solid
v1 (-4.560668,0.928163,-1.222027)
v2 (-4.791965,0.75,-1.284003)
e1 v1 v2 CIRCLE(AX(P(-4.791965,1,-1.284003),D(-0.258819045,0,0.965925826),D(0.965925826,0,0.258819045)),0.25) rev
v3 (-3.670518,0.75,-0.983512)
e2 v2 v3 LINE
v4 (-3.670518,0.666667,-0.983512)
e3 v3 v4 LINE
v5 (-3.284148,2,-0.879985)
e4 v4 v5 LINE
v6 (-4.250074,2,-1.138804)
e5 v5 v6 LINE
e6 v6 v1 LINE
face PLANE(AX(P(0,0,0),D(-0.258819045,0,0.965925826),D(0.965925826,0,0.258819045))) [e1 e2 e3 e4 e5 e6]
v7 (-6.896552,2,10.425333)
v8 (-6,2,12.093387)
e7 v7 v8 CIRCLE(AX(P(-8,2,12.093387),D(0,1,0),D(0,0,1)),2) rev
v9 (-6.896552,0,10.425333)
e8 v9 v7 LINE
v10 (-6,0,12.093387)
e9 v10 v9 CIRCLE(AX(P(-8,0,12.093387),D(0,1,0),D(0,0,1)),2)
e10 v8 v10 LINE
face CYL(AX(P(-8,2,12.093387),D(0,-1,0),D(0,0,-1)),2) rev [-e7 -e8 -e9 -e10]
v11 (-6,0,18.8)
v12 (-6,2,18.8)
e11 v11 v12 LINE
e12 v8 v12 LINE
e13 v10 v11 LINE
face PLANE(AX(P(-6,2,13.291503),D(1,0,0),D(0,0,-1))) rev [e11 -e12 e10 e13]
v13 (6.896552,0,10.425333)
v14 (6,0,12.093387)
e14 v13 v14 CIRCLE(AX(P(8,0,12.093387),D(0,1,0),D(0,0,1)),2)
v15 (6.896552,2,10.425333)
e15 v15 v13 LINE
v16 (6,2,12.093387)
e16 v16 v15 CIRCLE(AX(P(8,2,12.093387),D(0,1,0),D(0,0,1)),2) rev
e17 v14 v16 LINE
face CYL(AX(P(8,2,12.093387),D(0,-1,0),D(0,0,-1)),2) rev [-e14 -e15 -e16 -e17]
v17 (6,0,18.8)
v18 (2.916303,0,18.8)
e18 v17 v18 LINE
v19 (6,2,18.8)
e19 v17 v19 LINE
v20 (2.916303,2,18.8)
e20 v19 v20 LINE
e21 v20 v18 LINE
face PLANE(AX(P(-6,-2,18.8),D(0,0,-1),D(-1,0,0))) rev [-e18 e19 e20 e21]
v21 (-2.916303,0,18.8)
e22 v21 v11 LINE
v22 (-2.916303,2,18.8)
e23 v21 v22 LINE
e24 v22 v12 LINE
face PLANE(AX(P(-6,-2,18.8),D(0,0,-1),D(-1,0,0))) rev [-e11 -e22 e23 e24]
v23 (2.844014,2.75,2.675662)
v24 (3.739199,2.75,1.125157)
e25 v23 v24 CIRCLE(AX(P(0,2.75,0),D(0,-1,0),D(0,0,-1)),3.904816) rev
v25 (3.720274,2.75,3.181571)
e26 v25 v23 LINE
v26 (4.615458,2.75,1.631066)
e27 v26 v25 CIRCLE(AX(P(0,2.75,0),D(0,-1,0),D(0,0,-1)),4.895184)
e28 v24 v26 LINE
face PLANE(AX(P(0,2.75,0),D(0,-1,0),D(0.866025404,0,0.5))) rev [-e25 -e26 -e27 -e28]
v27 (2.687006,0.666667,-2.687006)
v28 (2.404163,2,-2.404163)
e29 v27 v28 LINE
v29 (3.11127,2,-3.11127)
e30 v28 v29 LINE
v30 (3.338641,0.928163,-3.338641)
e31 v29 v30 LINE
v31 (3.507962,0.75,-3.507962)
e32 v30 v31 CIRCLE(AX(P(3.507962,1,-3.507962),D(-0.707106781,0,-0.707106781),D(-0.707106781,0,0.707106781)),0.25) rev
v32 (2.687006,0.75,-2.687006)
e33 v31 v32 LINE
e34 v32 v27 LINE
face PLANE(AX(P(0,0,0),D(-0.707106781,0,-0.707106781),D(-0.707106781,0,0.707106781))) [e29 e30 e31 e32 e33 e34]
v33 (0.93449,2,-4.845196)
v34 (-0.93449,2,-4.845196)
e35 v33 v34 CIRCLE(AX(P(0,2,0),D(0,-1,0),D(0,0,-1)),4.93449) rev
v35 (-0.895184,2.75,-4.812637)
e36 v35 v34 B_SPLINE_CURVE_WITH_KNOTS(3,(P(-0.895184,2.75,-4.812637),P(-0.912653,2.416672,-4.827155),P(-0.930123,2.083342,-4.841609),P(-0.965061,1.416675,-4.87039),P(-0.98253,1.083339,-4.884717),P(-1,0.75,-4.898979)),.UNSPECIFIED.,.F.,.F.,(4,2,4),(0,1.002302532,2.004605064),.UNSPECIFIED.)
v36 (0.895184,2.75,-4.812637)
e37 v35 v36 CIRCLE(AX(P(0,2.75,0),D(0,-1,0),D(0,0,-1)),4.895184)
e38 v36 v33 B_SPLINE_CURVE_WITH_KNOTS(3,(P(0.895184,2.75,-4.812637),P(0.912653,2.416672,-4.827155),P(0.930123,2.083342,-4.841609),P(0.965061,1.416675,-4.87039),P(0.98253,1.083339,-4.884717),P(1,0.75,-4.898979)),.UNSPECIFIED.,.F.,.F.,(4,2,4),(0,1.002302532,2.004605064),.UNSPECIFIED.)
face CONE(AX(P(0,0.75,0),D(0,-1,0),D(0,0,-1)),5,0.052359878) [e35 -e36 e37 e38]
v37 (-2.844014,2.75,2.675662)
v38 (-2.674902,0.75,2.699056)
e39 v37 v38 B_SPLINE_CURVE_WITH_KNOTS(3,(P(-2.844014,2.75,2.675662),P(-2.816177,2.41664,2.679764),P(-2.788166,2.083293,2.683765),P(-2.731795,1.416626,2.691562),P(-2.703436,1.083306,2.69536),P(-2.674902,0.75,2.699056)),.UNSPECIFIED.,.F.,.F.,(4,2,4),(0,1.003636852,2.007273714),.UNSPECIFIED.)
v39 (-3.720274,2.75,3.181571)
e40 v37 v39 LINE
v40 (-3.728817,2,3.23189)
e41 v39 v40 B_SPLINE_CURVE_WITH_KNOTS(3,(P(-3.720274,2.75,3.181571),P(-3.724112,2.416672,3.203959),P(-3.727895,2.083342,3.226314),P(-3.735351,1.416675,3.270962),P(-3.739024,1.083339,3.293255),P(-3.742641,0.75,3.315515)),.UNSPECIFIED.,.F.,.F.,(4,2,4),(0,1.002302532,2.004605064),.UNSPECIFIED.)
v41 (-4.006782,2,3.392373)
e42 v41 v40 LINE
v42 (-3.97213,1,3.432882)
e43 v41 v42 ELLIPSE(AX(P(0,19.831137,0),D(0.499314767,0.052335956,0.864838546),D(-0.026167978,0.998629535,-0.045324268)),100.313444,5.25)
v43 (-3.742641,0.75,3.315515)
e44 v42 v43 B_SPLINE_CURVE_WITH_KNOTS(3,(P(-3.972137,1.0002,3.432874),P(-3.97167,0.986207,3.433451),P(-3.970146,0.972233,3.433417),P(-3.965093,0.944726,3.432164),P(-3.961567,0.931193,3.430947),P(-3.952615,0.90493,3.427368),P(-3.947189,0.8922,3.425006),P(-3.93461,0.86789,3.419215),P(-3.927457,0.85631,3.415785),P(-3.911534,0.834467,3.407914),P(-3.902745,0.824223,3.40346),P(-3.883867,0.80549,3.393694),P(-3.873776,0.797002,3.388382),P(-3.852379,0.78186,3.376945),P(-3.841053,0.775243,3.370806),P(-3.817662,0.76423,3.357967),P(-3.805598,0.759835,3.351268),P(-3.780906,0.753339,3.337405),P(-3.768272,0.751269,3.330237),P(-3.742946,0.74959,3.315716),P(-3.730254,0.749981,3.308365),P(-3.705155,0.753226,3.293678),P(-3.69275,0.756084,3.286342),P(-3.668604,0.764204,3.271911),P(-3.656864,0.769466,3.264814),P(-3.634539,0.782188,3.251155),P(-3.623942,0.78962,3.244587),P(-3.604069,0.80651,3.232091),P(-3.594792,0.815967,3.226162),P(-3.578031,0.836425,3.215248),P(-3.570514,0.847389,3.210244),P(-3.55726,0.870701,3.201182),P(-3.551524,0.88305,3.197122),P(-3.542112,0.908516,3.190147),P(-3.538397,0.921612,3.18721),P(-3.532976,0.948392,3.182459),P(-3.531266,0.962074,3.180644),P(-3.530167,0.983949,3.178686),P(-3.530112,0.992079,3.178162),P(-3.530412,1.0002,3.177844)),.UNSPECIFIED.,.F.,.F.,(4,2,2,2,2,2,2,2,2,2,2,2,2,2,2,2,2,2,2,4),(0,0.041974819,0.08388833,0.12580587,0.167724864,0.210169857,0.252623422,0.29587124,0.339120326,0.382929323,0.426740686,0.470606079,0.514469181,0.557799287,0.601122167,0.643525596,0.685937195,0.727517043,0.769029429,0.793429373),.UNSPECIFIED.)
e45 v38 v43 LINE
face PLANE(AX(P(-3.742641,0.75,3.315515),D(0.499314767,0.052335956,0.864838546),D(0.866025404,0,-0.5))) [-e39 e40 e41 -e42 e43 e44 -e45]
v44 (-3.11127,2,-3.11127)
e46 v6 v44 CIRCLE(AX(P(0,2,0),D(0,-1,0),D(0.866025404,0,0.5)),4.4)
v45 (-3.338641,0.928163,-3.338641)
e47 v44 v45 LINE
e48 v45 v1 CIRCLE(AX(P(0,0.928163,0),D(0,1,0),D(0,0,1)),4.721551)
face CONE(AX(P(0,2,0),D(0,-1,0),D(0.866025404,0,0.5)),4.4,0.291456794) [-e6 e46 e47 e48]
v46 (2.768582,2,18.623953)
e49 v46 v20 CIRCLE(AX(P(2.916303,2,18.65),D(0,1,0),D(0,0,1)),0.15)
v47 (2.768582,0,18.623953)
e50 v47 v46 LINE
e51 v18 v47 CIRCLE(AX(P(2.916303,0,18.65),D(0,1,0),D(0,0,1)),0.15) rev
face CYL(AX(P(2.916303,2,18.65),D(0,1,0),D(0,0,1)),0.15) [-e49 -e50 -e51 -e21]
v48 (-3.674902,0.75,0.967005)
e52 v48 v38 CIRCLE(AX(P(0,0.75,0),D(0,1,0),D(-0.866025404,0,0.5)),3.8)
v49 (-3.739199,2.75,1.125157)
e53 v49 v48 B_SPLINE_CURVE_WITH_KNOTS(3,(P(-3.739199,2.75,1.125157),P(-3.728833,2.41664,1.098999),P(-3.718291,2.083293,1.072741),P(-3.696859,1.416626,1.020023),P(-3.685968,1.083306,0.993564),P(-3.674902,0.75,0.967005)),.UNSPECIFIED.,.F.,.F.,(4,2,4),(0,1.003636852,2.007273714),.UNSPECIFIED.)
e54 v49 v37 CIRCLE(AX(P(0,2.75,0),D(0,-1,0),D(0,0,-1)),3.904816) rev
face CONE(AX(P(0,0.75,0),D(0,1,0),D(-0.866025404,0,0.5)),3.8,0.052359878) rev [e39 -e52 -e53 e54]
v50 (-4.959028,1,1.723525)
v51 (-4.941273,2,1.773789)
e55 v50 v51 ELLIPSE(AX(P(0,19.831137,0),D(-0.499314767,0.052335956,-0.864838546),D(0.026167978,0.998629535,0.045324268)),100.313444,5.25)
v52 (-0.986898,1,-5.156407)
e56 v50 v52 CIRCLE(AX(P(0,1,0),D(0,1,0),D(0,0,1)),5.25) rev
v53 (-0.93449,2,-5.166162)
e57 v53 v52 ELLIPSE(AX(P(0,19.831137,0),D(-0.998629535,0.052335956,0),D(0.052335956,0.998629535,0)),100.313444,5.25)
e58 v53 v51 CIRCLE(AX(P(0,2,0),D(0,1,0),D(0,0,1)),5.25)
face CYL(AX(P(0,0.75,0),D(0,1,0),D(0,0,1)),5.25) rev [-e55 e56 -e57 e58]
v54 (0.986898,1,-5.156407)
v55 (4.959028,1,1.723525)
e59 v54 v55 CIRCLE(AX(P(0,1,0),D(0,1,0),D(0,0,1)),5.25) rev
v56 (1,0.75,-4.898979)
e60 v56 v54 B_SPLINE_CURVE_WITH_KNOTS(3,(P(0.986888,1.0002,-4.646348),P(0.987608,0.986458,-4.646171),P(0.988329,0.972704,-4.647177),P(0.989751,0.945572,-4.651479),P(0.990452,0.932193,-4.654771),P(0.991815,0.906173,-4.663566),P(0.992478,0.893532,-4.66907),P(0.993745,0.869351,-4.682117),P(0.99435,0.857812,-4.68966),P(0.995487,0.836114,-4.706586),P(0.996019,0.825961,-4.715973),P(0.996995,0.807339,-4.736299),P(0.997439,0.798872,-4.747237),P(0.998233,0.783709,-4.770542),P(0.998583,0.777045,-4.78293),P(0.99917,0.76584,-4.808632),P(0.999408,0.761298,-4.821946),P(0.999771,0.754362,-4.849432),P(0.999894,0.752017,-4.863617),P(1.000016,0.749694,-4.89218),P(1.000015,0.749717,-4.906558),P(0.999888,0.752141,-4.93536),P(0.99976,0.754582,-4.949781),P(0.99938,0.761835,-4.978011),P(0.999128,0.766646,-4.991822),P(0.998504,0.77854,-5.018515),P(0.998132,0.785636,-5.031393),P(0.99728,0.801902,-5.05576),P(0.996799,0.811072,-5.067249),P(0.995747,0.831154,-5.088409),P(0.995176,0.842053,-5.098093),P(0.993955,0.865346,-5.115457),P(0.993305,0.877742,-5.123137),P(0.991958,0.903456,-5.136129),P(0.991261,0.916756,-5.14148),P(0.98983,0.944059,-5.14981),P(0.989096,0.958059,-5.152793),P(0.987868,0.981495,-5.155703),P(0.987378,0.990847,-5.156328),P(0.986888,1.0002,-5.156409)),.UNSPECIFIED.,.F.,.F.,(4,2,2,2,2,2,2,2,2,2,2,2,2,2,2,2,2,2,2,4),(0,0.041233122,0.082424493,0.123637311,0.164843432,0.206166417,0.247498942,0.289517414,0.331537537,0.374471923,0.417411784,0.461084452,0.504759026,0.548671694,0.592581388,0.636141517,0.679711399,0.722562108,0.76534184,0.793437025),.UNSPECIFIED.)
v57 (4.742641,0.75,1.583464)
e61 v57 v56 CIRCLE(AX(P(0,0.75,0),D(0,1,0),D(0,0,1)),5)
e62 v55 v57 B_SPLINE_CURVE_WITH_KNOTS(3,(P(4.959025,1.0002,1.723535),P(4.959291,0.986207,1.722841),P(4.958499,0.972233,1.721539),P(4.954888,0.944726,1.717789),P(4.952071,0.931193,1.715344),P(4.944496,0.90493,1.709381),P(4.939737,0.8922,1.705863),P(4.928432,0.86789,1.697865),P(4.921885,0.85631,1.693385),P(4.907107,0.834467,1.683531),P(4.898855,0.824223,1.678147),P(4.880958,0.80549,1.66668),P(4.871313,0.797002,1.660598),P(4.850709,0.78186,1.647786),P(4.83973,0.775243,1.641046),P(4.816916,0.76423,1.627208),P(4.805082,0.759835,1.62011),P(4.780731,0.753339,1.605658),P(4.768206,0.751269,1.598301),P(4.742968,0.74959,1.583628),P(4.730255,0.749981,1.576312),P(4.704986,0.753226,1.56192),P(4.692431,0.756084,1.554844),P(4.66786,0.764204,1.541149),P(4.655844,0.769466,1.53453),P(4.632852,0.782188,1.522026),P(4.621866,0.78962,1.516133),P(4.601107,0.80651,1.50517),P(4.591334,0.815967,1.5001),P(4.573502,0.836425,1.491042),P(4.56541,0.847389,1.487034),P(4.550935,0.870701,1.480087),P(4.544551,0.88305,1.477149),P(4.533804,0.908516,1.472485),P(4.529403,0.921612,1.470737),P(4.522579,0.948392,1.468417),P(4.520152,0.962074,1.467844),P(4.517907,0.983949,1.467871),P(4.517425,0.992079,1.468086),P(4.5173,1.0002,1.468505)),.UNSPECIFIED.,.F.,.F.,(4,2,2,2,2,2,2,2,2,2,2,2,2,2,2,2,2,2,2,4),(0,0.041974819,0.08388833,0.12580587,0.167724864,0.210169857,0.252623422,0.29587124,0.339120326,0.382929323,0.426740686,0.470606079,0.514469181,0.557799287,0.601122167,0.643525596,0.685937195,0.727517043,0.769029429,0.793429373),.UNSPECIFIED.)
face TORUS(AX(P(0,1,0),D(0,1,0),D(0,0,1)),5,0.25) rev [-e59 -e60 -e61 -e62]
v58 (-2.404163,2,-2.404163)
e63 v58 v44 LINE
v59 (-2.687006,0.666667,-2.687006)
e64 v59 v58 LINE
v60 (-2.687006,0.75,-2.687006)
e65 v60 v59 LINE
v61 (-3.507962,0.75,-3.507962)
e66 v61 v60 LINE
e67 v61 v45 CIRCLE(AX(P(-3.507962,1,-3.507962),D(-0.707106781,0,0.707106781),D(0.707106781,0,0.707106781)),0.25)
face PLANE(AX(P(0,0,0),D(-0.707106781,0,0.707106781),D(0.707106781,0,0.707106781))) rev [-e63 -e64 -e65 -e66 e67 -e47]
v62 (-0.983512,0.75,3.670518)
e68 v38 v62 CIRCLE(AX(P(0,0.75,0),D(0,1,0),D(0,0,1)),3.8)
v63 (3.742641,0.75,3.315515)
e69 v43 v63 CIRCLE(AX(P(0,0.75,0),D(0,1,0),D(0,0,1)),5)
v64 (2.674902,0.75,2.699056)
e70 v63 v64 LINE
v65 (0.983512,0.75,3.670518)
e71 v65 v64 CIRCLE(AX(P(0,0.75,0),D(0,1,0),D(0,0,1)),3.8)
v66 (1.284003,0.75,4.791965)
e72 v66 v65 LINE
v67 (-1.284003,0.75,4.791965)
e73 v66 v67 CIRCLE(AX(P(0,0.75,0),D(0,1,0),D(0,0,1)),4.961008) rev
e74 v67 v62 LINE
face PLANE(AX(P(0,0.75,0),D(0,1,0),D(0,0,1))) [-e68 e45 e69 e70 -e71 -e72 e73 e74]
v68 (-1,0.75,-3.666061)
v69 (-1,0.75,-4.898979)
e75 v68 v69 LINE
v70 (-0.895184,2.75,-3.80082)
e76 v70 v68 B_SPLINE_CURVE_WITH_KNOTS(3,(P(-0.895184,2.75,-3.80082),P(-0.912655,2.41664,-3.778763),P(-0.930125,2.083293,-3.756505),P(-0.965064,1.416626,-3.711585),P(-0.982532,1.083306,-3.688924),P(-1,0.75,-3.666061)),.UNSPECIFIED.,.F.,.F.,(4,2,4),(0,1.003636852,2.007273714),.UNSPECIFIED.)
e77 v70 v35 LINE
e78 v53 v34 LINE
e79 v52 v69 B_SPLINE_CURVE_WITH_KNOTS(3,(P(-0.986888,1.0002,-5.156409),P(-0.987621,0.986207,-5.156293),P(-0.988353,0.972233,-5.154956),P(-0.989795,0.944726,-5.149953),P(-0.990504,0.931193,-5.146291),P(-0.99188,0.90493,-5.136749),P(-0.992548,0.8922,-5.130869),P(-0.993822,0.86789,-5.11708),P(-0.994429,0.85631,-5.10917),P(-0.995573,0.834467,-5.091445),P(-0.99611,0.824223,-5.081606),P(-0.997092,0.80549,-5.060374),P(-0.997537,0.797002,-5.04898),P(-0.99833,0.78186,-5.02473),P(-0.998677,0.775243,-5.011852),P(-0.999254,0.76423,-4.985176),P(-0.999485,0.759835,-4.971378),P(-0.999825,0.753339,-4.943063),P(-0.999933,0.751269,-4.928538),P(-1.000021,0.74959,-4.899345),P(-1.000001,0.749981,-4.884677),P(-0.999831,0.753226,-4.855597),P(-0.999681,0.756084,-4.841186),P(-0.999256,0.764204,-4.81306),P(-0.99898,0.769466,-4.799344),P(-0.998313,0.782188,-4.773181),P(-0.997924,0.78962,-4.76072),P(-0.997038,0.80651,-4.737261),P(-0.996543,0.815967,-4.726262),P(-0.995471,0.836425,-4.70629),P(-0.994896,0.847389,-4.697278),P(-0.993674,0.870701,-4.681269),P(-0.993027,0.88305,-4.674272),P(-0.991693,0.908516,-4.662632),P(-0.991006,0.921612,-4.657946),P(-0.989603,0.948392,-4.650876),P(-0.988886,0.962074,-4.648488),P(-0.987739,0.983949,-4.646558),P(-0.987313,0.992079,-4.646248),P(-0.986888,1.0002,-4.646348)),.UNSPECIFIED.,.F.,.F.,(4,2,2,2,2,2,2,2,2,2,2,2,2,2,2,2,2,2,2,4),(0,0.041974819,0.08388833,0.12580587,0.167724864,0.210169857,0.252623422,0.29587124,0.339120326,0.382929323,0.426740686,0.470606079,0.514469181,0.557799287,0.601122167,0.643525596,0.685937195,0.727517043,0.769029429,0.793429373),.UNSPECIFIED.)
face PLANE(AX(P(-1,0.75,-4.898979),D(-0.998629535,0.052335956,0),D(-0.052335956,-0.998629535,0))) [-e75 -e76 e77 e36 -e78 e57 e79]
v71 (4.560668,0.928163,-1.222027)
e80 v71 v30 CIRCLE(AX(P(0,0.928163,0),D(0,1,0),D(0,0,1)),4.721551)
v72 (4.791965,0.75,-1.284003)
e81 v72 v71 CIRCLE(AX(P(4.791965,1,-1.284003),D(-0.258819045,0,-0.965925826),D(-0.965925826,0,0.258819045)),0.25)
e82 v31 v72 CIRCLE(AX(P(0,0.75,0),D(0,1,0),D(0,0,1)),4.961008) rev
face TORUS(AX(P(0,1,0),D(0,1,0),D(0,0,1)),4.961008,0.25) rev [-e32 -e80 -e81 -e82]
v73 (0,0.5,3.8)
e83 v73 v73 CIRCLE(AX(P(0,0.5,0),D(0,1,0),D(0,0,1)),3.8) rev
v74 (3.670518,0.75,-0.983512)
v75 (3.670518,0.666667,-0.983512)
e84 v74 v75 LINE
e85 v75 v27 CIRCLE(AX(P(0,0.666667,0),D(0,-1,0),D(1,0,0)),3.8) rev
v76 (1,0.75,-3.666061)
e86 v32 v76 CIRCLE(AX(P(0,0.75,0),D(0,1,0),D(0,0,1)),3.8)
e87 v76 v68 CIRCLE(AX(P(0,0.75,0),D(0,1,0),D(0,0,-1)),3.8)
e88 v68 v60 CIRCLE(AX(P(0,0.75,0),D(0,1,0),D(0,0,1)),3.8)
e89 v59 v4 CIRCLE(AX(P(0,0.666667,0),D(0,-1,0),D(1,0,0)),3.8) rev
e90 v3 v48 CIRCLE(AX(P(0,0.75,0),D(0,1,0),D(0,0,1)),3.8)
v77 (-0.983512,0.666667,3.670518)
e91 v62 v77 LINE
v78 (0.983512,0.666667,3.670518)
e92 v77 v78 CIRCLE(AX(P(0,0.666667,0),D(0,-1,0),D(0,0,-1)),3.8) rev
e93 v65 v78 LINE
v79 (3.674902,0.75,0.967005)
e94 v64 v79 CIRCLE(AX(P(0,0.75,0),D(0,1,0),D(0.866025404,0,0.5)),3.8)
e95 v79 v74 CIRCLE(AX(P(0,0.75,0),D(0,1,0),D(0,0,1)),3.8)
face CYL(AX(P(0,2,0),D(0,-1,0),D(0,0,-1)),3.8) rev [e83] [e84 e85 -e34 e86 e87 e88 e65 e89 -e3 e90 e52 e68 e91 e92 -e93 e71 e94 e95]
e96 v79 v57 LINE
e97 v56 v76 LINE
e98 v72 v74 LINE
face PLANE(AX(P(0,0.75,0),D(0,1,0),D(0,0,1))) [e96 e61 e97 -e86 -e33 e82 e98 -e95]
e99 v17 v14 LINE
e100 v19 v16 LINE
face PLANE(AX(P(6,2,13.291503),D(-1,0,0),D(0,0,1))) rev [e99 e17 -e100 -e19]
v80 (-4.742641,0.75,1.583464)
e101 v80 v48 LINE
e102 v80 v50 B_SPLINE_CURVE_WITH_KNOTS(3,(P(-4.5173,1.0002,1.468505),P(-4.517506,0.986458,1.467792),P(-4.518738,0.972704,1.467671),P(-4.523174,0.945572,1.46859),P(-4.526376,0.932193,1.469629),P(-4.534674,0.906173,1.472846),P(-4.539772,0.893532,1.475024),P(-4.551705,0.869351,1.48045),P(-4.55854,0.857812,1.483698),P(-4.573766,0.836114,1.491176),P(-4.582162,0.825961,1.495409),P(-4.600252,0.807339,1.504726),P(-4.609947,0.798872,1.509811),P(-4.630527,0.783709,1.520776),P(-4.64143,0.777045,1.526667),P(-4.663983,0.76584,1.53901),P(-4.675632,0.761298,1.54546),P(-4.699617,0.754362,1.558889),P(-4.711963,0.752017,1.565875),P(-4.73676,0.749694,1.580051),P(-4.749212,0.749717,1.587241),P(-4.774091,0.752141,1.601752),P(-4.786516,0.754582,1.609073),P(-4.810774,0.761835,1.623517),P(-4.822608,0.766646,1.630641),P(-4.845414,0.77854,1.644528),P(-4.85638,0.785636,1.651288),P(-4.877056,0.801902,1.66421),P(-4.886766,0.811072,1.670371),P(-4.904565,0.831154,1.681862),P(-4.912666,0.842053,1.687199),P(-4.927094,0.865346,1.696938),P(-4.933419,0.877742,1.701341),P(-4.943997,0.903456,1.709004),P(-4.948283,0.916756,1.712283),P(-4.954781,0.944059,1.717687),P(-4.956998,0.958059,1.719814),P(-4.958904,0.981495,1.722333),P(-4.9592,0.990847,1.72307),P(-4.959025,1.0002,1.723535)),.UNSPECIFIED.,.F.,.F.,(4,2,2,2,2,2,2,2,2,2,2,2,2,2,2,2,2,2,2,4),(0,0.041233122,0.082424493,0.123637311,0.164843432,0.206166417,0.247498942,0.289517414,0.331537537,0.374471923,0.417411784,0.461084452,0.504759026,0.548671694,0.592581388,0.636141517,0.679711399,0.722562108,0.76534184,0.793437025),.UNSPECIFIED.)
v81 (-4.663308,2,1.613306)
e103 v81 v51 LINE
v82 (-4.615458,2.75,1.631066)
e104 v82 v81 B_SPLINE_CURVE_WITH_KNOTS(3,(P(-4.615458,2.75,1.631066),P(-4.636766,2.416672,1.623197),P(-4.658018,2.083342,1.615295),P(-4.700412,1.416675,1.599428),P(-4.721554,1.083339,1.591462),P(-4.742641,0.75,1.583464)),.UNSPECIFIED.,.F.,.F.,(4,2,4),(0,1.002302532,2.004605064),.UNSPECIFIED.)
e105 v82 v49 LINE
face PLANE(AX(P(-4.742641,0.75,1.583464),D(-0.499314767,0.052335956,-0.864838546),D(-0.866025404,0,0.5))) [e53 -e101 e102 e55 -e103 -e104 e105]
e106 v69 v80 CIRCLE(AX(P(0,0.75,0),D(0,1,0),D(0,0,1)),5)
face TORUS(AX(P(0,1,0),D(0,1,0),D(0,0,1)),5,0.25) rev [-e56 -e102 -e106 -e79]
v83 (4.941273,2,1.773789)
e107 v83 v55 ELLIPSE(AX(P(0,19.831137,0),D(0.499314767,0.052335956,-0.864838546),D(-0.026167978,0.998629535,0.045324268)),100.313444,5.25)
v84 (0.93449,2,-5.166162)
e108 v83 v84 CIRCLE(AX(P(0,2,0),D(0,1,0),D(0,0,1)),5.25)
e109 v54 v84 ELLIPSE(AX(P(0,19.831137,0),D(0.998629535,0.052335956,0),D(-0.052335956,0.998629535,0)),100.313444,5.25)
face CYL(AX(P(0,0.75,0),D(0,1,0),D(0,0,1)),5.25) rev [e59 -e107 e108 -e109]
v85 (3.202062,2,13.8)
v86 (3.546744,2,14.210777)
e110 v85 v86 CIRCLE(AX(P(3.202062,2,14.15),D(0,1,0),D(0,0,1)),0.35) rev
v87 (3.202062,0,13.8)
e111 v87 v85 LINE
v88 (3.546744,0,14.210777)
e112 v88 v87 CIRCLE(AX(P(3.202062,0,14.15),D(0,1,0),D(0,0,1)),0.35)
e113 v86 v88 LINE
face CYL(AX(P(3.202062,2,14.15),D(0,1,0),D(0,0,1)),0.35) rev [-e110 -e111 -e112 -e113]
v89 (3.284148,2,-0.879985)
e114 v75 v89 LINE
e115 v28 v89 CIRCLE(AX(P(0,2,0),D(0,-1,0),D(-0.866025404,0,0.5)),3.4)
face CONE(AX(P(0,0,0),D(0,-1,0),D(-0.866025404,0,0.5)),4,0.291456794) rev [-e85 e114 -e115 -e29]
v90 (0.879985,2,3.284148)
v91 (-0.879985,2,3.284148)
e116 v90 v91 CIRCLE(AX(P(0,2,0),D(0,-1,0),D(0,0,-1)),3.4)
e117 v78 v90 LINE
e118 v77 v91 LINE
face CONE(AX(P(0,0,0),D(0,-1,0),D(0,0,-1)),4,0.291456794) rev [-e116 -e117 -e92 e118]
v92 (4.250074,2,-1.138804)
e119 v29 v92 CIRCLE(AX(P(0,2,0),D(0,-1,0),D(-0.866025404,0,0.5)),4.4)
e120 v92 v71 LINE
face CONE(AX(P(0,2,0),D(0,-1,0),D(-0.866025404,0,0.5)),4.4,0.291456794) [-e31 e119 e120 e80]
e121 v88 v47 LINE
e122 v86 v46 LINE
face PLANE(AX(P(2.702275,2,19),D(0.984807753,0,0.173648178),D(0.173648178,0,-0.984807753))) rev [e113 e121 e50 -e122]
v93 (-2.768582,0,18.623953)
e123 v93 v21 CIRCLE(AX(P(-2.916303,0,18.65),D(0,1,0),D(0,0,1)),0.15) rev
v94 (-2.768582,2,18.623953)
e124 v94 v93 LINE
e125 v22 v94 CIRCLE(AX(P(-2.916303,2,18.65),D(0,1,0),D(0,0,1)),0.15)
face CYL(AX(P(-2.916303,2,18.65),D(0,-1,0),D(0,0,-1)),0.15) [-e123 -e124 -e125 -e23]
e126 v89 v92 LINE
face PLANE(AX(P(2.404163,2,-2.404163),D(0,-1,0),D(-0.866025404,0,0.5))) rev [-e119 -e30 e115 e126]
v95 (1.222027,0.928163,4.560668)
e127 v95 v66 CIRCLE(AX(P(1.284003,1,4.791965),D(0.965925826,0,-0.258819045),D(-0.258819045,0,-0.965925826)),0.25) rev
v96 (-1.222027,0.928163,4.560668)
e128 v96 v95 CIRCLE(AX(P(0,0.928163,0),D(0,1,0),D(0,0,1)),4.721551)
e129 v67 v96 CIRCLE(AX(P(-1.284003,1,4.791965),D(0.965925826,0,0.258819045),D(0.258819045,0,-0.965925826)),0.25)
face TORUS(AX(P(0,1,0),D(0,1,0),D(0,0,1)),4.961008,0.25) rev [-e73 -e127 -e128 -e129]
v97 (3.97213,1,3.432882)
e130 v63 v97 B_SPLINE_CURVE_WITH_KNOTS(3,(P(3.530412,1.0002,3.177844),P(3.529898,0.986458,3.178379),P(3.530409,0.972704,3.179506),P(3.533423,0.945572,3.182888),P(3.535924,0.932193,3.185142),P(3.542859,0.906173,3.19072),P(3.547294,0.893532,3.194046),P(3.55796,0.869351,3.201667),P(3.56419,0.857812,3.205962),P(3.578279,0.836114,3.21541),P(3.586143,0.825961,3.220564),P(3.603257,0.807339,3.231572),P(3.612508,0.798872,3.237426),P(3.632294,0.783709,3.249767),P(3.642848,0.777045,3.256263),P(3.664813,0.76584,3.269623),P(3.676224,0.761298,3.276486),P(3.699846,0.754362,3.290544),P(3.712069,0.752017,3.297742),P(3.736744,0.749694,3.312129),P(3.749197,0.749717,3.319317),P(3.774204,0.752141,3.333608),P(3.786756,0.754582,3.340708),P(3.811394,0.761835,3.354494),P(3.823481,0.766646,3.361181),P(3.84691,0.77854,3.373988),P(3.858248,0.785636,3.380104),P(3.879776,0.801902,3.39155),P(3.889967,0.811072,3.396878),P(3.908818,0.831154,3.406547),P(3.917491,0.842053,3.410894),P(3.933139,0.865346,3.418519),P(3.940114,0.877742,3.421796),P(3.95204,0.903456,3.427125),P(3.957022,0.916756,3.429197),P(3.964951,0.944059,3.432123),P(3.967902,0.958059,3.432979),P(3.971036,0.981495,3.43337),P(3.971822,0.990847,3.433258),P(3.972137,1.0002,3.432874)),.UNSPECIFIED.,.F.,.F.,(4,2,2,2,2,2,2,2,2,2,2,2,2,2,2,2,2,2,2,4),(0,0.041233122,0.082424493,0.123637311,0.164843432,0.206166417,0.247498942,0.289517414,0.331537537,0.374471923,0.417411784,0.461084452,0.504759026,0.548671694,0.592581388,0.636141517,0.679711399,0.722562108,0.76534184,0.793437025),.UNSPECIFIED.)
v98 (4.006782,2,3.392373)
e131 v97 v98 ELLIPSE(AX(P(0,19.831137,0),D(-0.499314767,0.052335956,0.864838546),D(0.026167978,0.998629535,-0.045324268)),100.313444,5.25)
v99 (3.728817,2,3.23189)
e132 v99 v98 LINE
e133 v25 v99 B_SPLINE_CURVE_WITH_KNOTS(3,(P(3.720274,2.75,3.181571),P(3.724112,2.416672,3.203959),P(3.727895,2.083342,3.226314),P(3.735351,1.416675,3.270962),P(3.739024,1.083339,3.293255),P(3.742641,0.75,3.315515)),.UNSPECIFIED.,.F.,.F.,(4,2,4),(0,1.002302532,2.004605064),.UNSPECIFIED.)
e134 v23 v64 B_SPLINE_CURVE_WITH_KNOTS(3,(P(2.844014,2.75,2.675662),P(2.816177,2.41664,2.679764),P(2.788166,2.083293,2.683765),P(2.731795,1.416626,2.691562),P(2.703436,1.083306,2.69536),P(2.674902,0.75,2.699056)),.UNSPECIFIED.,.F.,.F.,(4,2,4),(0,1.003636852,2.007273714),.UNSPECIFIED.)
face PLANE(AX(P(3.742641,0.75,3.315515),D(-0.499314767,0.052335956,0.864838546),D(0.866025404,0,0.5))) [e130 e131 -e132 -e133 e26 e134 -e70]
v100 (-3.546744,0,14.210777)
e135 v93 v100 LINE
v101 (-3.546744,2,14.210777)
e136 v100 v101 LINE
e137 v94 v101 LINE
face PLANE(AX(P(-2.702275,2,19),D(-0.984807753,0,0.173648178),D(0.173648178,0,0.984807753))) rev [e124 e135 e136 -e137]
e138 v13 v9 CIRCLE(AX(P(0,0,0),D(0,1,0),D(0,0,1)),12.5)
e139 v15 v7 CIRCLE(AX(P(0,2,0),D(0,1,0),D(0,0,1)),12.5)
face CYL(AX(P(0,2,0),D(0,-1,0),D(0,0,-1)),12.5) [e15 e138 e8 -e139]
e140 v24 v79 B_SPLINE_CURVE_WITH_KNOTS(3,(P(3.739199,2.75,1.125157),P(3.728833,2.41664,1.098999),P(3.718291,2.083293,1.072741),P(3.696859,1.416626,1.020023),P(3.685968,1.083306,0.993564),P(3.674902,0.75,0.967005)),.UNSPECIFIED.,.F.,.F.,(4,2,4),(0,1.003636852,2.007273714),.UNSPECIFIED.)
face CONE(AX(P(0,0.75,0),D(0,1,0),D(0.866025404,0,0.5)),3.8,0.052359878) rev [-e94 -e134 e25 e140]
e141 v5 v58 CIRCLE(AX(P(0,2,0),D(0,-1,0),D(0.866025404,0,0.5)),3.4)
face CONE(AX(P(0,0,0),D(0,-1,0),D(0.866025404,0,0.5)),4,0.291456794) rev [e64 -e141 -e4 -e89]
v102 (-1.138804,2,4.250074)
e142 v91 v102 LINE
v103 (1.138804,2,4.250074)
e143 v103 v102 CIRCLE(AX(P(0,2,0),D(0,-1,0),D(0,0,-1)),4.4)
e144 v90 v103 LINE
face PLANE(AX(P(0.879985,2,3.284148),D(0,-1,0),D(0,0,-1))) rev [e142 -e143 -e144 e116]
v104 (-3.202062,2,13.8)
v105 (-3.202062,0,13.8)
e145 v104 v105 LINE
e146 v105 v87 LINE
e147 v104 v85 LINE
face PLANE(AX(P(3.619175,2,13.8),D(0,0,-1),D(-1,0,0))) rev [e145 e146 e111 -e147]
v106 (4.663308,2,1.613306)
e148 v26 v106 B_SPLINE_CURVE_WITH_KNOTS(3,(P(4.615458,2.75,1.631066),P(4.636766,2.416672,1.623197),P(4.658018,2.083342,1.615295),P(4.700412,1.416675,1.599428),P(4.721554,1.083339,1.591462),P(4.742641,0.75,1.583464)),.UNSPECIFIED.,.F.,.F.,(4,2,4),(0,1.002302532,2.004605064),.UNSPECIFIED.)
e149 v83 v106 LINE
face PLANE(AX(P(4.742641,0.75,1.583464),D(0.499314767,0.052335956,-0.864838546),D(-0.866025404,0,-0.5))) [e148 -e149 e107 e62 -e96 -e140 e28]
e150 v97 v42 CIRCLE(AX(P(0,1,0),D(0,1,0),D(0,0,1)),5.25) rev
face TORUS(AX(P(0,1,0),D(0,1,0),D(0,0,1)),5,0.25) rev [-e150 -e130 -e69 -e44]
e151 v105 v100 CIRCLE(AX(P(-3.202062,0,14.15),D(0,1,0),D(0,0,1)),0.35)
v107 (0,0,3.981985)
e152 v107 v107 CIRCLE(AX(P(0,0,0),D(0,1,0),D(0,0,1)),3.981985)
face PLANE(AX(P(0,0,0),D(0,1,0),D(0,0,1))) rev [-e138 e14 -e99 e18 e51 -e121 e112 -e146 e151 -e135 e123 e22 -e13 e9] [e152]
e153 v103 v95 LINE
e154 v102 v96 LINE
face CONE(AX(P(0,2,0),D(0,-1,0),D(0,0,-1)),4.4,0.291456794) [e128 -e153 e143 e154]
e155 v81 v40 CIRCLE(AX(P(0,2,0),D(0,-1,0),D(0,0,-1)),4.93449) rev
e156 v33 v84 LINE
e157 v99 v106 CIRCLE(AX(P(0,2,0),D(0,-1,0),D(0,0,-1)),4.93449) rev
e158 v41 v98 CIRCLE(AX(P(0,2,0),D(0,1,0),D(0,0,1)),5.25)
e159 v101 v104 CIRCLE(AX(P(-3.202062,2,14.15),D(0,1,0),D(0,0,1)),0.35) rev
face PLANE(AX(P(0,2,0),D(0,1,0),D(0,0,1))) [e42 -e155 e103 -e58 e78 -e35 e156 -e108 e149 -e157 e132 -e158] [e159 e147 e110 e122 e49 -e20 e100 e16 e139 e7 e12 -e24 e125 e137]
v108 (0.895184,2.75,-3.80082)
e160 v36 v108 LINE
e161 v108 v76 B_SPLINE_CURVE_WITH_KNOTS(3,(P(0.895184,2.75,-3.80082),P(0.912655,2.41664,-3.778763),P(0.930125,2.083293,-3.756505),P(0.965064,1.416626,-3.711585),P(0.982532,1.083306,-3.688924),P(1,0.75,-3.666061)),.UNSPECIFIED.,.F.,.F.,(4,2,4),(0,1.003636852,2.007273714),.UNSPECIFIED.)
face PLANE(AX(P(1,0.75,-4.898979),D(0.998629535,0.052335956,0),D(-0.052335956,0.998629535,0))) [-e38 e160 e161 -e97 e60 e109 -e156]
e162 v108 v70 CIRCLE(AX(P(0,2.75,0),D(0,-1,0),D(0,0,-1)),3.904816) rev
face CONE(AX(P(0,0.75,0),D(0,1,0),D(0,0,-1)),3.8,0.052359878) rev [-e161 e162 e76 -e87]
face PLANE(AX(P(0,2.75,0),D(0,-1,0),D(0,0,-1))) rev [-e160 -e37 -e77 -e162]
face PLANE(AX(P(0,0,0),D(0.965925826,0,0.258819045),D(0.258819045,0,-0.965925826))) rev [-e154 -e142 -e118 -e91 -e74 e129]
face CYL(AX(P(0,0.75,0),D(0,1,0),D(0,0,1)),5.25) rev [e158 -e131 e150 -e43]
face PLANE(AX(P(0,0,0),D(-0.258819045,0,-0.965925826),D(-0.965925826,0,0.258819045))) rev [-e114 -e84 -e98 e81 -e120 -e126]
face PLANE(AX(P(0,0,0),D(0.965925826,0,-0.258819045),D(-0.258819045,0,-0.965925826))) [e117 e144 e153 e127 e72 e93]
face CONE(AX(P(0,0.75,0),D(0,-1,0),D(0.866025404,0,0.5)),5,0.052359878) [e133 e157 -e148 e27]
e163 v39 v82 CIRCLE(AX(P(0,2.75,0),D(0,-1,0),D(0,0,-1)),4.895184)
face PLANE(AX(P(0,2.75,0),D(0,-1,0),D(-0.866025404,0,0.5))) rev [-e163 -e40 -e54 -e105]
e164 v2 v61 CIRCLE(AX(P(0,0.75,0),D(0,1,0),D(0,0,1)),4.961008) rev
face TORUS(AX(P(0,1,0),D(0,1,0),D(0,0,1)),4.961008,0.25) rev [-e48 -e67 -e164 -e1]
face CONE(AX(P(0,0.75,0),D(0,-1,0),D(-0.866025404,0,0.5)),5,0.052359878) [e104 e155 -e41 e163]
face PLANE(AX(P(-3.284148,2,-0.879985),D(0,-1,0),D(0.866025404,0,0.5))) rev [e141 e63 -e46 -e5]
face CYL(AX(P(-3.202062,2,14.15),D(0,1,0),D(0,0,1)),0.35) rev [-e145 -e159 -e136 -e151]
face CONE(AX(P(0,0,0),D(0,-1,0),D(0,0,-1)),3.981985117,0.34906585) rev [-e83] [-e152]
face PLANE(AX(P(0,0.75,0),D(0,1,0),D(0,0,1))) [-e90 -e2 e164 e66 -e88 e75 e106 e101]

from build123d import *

# Parameters (mm, degrees)
SKETCH1_R                = 4
BOSS_EXTRUDE1_DEPTH      = 2
SKETCH2_R                = 12.5
SKETCH2_R_2              = 3.8
BOSS_EXTRUDE2_DEPTH      = 2
SKETCH4_W                = 12
SKETCH4_H                = 0.2
CUT_EXTRUDE1_DEPTH       = 4
FILLET3_R                = 0.35
FILLET4_R                = 0.15
FILLET6_R                = 2
SKETCH13_R               = 5.25
CUT_EXTRUDE5_DEPTH       = 1.25
REVOLVE2_ANGLE           = 30
CIRPATTERN2_COUNT        = 3
CHAMFER1_SIZE            = 0.5
CHAMFER1_SIZE2           = 0.181985117
FILLET14_R               = 0.25
BOSS_EXTRUDE8_DEPTH      = 2
BOSS_EXTRUDE8_DRAFT      = -3
SKETCH16_W               = 2
SKETCH16_H               = 1.934959958
BOSS_EXTRUDE9_DEPTH      = 1.25
BOSS_EXTRUDE9_TAPER      = 3
CIRPATTERN3_COUNT        = 3
CIRPATTERN3_COPY_1_DEPTH = 2
CIRPATTERN3_COPY_1_DRAFT = -3
CIRPATTERN3_COPY_2_DEPTH = 2
CIRPATTERN3_COPY_2_DRAFT = -3


with BuildPart() as part:
    # Sketch1 → Boss-Extrude1 (new body)
    with BuildSketch(Plane(origin=(0, 0, 0), x_dir=(1, 0, 0), z_dir=(0, 1, 0))):
        Polygon((-6, 6), (-6, -13.291502622), (-6, -19), (-2.70227506, -19), (-3.619175359, -13.8), (0, -13.8), (3.619175359, -13.8), (2.70227506, -19), (6, -19), (6, -13.291502622), (6, 6), align=None)
        with Locations(Location((0, 0, 0), (0, 0, 270))):
            Circle(SKETCH1_R, mode=Mode.SUBTRACT)
    extrude(amount=BOSS_EXTRUDE1_DEPTH)

    # Sketch2 → Boss-Extrude2 (add)
    with BuildSketch(Plane(origin=(0, 0, 0), x_dir=(1, 0, 0), z_dir=(0, 1, 0))):
        Circle(SKETCH2_R)
        with Locations(Location((0, 0, 0), (0, 0, 270))):
            Circle(SKETCH2_R_2, mode=Mode.SUBTRACT)
    extrude(amount=BOSS_EXTRUDE2_DEPTH)

    # Sketch4 → Cut-Extrude1 (cut)
    with BuildSketch(Plane(origin=(0, 2, 0), x_dir=(1, 0, 0), z_dir=(0, 1, 0))):
        with Locations((0, -18.9)):
            Rectangle(SKETCH4_W, SKETCH4_H)
    extrude(amount=-CUT_EXTRUDE1_DEPTH, mode=Mode.SUBTRACT)

    # Fillet3
    fillet3_edges = [part.edges().sort_by_distance(p)[0] for p in [
        (3.619175359, 1, 13.8),
        (-3.619175359, 1, 13.8),
    ]]
    fillet(fillet3_edges, radius=FILLET3_R)

    # Fillet4
    fillet4_edges = [part.edges().sort_by_distance(p)[0] for p in [
        (2.737540456, 1, 18.8),
        (-2.737540456, 1, 18.8),
    ]]
    fillet(fillet4_edges, radius=FILLET4_R)

    # Fillet6
    fillet6_edges = [part.edges().sort_by_distance(p)[0] for p in [
        (6, 1, 10.9658561),
        (-6, 1, 10.9658561),
    ]]
    fillet(fillet6_edges, radius=FILLET6_R)

    # Sketch13 → Cut-Extrude5 (cut)
    with BuildSketch(Plane(origin=(0, 2, 0), x_dir=(1, 0, 0), z_dir=(0, 1, 0))):
        with Locations(Location((0, 0, 0), (0, 0, 270))):
            Circle(SKETCH13_R)
    extrude(amount=-CUT_EXTRUDE5_DEPTH, mode=Mode.SUBTRACT)

    # Sketch12 → Revolve2 (revolve, symmetric)
    with BuildSketch(Plane(origin=(0, 0, 0), x_dir=(0, 0, -1), z_dir=(1, 0, 0))) as revolve2_sk:
        Polygon((-4, 0), (-3.4, 2), (-4.4, 2), (-5, 0), align=None)
    revolve2 = revolve(axis=Axis((0, 0, 0), (0, 1, 0)), revolution_arc=REVOLVE2_ANGLE / 2)
    revolve2 = revolve2 + revolve(revolve2_sk.sketch, axis=Axis((0, 0, 0), (0, -1, 0)), revolution_arc=REVOLVE2_ANGLE / 2)

    # CirPattern2: Revolve2 ×3 about axis
    cirpattern2_axis = Axis((0, 0, 0), (0, 1, 0))
    for i in range(1, CIRPATTERN2_COUNT):
        add(revolve2.rotate(cirpattern2_axis, i * 360 / CIRPATTERN2_COUNT))

    # Chamfer1
    chamfer1_edges = [part.edges().sort_by_distance(p)[0] for p in [
        (0, 0, -3.8),
    ]]
    chamfer1_side = [part.faces().sort_by_distance(p)[0] for p in [
        (0, 0.375, -3.8),
    ]]
    chamfer(chamfer1_edges, length=CHAMFER1_SIZE, length2=CHAMFER1_SIZE2, reference=chamfer1_side[0])

    # Fillet14
    fillet14_edges = [part.edges().sort_by_distance(p)[0] for p in [
        (0, 0.75, -5.25),
        (0, 0.75, 4.775),
        (-4.135271303, 0.75, -2.3875),
        (4.135271303, 0.75, -2.3875),
    ]]
    fillet(fillet14_edges, radius=FILLET14_R)


with BuildPart() as boss_extrude8_tool:
    # Boss-Extrude8: read off the stored shape, not the designer's step
    # Boss-Extrude8 outline → Boss-Extrude8 (with draft: the straight prism first)
    with BuildSketch(Plane.XZ.offset(-2.75)):
        with BuildLine():
            Line((-0.895184441, -3.800819565), (-0.895184441, -4.812637066))
            ThreePointArc((-0.895184441, -4.812637066), (0, -4.895184441), (0.895184441, -4.812637066))
            Line((0.895184441, -4.812637066), (0.895184441, -3.800819565))
            ThreePointArc((0.895184441, -3.800819565), (0, -3.904815559), (-0.895184441, -3.800819565))
        make_face()
    extrude(amount=BOSS_EXTRUDE8_DEPTH)
    # Boss-Extrude8: the draft: its side faces are tilted about the plane it starts from
    boss_extrude8_sides = [boss_extrude8_tool.faces().sort_by_distance(p)[0] for p in [
        (0.895184441, 1.75, -4.306728316),
        (0, 1.75, -3.904815559),
        (-0.895184441, 1.75, -4.306728316),
        (0, 1.75, -4.895184441),
    ]]
    draft(boss_extrude8_sides, Plane.XZ.offset(-2.75), BOSS_EXTRUDE8_DRAFT)


with BuildPart() as part_1:
    add(part.part)

    # Boss-Extrude8: add boss_extrude8_tool
    add(boss_extrude8_tool.part)

    # Sketch16 → Boss-Extrude9 (add)
    with BuildSketch(Plane(origin=(0, 0.75, 0), x_dir=(1, 0, 0), z_dir=(0, 1, 0))):
        with Locations((0, 5.25)):
            Rectangle(SKETCH16_W, SKETCH16_H)
    boss_extrude9 = extrude(amount=BOSS_EXTRUDE9_DEPTH, taper=BOSS_EXTRUDE9_TAPER)

    # CirPattern3: Boss-Extrude9 ×3 about axis
    cirpattern3_axis = Axis((0, 0, 0), (0, 1, 0))
    for i in range(1, CIRPATTERN3_COUNT):
        add(boss_extrude9.rotate(cirpattern3_axis, i * 360 / CIRPATTERN3_COUNT))


with BuildPart() as cirpattern3_copy_1_tool:
    # CirPattern3 copy 1 sketch → CirPattern3 copy 1 (with draft: the straight prism first)
    with BuildSketch(Plane(origin=(0, 2.75, 0), x_dir=(-0.4999999999999998, 0, -0.8660254037844387), z_dir=(0, -1, 0))):
        with BuildLine():
            Line((-0.895184441, -3.800819565), (-0.895184441, -4.812637066))
            ThreePointArc((-0.895184441, -4.812637066), (0, -4.895184441), (0.895184441, -4.812637066))
            Line((0.895184441, -4.812637066), (0.895184441, -3.800819565))
            ThreePointArc((0.895184441, -3.800819565), (0, -3.904815559), (-0.895184441, -3.800819565))
        make_face()
    extrude(amount=CIRPATTERN3_COPY_1_DEPTH)
    # CirPattern3 copy 1: the draft: its side faces are tilted about the plane it starts from
    cirpattern3_copy_1_sides = [cirpattern3_copy_1_tool.faces().sort_by_distance(p)[0] for p in [
        (-4.177328349, 1.75, 1.378111691),
        (-3.381669471, 1.75, 1.952407779),
        (-3.282143908, 1.75, 2.928616625),
        (-4.239354082, 1.75, 2.44759222),
    ]]
    draft(cirpattern3_copy_1_sides, Plane(origin=(0, 2.75, 0), x_dir=(-0.4999999999999998, 0, -0.8660254037844387), z_dir=(0, -1, 0)), CIRPATTERN3_COPY_1_DRAFT)


with BuildPart() as part_2:
    add(part_1.part)

    # CirPattern3 copy 1: add cirpattern3_copy_1_tool
    add(cirpattern3_copy_1_tool.part)


with BuildPart() as cirpattern3_copy_2_tool:
    # CirPattern3 copy 2 sketch → CirPattern3 copy 2 (with draft: the straight prism first)
    with BuildSketch(Plane(origin=(0, 2.75, 0), x_dir=(-0.5000000000000004, 0, 0.8660254037844384), z_dir=(0, -1, 0))):
        with BuildLine():
            Line((-0.895184441, -3.800819565), (-0.895184441, -4.812637066))
            ThreePointArc((-0.895184441, -4.812637066), (0, -4.895184441), (0.895184441, -4.812637066))
            Line((0.895184441, -4.812637066), (0.895184441, -3.800819565))
            ThreePointArc((0.895184441, -3.800819565), (0, -3.904815559), (-0.895184441, -3.800819565))
        make_face()
    extrude(amount=CIRPATTERN3_COPY_2_DEPTH)
    # CirPattern3 copy 2: the draft: its side faces are tilted about the plane it starts from
    cirpattern3_copy_2_sides = [cirpattern3_copy_2_tool.faces().sort_by_distance(p)[0] for p in [
        (3.282143908, 1.75, 2.928616625),
        (3.381669471, 1.75, 1.95240778),
        (4.177328349, 1.75, 1.378111691),
        (4.239354082, 1.75, 2.447592221),
    ]]
    draft(cirpattern3_copy_2_sides, Plane(origin=(0, 2.75, 0), x_dir=(-0.5000000000000004, 0, 0.8660254037844384), z_dir=(0, -1, 0)), CIRPATTERN3_COPY_2_DRAFT)


with BuildPart() as part_3:
    add(part_2.part)

    # CirPattern3 copy 2: add cirpattern3_copy_2_tool
    add(cirpattern3_copy_2_tool.part)


solid = part_3.part
